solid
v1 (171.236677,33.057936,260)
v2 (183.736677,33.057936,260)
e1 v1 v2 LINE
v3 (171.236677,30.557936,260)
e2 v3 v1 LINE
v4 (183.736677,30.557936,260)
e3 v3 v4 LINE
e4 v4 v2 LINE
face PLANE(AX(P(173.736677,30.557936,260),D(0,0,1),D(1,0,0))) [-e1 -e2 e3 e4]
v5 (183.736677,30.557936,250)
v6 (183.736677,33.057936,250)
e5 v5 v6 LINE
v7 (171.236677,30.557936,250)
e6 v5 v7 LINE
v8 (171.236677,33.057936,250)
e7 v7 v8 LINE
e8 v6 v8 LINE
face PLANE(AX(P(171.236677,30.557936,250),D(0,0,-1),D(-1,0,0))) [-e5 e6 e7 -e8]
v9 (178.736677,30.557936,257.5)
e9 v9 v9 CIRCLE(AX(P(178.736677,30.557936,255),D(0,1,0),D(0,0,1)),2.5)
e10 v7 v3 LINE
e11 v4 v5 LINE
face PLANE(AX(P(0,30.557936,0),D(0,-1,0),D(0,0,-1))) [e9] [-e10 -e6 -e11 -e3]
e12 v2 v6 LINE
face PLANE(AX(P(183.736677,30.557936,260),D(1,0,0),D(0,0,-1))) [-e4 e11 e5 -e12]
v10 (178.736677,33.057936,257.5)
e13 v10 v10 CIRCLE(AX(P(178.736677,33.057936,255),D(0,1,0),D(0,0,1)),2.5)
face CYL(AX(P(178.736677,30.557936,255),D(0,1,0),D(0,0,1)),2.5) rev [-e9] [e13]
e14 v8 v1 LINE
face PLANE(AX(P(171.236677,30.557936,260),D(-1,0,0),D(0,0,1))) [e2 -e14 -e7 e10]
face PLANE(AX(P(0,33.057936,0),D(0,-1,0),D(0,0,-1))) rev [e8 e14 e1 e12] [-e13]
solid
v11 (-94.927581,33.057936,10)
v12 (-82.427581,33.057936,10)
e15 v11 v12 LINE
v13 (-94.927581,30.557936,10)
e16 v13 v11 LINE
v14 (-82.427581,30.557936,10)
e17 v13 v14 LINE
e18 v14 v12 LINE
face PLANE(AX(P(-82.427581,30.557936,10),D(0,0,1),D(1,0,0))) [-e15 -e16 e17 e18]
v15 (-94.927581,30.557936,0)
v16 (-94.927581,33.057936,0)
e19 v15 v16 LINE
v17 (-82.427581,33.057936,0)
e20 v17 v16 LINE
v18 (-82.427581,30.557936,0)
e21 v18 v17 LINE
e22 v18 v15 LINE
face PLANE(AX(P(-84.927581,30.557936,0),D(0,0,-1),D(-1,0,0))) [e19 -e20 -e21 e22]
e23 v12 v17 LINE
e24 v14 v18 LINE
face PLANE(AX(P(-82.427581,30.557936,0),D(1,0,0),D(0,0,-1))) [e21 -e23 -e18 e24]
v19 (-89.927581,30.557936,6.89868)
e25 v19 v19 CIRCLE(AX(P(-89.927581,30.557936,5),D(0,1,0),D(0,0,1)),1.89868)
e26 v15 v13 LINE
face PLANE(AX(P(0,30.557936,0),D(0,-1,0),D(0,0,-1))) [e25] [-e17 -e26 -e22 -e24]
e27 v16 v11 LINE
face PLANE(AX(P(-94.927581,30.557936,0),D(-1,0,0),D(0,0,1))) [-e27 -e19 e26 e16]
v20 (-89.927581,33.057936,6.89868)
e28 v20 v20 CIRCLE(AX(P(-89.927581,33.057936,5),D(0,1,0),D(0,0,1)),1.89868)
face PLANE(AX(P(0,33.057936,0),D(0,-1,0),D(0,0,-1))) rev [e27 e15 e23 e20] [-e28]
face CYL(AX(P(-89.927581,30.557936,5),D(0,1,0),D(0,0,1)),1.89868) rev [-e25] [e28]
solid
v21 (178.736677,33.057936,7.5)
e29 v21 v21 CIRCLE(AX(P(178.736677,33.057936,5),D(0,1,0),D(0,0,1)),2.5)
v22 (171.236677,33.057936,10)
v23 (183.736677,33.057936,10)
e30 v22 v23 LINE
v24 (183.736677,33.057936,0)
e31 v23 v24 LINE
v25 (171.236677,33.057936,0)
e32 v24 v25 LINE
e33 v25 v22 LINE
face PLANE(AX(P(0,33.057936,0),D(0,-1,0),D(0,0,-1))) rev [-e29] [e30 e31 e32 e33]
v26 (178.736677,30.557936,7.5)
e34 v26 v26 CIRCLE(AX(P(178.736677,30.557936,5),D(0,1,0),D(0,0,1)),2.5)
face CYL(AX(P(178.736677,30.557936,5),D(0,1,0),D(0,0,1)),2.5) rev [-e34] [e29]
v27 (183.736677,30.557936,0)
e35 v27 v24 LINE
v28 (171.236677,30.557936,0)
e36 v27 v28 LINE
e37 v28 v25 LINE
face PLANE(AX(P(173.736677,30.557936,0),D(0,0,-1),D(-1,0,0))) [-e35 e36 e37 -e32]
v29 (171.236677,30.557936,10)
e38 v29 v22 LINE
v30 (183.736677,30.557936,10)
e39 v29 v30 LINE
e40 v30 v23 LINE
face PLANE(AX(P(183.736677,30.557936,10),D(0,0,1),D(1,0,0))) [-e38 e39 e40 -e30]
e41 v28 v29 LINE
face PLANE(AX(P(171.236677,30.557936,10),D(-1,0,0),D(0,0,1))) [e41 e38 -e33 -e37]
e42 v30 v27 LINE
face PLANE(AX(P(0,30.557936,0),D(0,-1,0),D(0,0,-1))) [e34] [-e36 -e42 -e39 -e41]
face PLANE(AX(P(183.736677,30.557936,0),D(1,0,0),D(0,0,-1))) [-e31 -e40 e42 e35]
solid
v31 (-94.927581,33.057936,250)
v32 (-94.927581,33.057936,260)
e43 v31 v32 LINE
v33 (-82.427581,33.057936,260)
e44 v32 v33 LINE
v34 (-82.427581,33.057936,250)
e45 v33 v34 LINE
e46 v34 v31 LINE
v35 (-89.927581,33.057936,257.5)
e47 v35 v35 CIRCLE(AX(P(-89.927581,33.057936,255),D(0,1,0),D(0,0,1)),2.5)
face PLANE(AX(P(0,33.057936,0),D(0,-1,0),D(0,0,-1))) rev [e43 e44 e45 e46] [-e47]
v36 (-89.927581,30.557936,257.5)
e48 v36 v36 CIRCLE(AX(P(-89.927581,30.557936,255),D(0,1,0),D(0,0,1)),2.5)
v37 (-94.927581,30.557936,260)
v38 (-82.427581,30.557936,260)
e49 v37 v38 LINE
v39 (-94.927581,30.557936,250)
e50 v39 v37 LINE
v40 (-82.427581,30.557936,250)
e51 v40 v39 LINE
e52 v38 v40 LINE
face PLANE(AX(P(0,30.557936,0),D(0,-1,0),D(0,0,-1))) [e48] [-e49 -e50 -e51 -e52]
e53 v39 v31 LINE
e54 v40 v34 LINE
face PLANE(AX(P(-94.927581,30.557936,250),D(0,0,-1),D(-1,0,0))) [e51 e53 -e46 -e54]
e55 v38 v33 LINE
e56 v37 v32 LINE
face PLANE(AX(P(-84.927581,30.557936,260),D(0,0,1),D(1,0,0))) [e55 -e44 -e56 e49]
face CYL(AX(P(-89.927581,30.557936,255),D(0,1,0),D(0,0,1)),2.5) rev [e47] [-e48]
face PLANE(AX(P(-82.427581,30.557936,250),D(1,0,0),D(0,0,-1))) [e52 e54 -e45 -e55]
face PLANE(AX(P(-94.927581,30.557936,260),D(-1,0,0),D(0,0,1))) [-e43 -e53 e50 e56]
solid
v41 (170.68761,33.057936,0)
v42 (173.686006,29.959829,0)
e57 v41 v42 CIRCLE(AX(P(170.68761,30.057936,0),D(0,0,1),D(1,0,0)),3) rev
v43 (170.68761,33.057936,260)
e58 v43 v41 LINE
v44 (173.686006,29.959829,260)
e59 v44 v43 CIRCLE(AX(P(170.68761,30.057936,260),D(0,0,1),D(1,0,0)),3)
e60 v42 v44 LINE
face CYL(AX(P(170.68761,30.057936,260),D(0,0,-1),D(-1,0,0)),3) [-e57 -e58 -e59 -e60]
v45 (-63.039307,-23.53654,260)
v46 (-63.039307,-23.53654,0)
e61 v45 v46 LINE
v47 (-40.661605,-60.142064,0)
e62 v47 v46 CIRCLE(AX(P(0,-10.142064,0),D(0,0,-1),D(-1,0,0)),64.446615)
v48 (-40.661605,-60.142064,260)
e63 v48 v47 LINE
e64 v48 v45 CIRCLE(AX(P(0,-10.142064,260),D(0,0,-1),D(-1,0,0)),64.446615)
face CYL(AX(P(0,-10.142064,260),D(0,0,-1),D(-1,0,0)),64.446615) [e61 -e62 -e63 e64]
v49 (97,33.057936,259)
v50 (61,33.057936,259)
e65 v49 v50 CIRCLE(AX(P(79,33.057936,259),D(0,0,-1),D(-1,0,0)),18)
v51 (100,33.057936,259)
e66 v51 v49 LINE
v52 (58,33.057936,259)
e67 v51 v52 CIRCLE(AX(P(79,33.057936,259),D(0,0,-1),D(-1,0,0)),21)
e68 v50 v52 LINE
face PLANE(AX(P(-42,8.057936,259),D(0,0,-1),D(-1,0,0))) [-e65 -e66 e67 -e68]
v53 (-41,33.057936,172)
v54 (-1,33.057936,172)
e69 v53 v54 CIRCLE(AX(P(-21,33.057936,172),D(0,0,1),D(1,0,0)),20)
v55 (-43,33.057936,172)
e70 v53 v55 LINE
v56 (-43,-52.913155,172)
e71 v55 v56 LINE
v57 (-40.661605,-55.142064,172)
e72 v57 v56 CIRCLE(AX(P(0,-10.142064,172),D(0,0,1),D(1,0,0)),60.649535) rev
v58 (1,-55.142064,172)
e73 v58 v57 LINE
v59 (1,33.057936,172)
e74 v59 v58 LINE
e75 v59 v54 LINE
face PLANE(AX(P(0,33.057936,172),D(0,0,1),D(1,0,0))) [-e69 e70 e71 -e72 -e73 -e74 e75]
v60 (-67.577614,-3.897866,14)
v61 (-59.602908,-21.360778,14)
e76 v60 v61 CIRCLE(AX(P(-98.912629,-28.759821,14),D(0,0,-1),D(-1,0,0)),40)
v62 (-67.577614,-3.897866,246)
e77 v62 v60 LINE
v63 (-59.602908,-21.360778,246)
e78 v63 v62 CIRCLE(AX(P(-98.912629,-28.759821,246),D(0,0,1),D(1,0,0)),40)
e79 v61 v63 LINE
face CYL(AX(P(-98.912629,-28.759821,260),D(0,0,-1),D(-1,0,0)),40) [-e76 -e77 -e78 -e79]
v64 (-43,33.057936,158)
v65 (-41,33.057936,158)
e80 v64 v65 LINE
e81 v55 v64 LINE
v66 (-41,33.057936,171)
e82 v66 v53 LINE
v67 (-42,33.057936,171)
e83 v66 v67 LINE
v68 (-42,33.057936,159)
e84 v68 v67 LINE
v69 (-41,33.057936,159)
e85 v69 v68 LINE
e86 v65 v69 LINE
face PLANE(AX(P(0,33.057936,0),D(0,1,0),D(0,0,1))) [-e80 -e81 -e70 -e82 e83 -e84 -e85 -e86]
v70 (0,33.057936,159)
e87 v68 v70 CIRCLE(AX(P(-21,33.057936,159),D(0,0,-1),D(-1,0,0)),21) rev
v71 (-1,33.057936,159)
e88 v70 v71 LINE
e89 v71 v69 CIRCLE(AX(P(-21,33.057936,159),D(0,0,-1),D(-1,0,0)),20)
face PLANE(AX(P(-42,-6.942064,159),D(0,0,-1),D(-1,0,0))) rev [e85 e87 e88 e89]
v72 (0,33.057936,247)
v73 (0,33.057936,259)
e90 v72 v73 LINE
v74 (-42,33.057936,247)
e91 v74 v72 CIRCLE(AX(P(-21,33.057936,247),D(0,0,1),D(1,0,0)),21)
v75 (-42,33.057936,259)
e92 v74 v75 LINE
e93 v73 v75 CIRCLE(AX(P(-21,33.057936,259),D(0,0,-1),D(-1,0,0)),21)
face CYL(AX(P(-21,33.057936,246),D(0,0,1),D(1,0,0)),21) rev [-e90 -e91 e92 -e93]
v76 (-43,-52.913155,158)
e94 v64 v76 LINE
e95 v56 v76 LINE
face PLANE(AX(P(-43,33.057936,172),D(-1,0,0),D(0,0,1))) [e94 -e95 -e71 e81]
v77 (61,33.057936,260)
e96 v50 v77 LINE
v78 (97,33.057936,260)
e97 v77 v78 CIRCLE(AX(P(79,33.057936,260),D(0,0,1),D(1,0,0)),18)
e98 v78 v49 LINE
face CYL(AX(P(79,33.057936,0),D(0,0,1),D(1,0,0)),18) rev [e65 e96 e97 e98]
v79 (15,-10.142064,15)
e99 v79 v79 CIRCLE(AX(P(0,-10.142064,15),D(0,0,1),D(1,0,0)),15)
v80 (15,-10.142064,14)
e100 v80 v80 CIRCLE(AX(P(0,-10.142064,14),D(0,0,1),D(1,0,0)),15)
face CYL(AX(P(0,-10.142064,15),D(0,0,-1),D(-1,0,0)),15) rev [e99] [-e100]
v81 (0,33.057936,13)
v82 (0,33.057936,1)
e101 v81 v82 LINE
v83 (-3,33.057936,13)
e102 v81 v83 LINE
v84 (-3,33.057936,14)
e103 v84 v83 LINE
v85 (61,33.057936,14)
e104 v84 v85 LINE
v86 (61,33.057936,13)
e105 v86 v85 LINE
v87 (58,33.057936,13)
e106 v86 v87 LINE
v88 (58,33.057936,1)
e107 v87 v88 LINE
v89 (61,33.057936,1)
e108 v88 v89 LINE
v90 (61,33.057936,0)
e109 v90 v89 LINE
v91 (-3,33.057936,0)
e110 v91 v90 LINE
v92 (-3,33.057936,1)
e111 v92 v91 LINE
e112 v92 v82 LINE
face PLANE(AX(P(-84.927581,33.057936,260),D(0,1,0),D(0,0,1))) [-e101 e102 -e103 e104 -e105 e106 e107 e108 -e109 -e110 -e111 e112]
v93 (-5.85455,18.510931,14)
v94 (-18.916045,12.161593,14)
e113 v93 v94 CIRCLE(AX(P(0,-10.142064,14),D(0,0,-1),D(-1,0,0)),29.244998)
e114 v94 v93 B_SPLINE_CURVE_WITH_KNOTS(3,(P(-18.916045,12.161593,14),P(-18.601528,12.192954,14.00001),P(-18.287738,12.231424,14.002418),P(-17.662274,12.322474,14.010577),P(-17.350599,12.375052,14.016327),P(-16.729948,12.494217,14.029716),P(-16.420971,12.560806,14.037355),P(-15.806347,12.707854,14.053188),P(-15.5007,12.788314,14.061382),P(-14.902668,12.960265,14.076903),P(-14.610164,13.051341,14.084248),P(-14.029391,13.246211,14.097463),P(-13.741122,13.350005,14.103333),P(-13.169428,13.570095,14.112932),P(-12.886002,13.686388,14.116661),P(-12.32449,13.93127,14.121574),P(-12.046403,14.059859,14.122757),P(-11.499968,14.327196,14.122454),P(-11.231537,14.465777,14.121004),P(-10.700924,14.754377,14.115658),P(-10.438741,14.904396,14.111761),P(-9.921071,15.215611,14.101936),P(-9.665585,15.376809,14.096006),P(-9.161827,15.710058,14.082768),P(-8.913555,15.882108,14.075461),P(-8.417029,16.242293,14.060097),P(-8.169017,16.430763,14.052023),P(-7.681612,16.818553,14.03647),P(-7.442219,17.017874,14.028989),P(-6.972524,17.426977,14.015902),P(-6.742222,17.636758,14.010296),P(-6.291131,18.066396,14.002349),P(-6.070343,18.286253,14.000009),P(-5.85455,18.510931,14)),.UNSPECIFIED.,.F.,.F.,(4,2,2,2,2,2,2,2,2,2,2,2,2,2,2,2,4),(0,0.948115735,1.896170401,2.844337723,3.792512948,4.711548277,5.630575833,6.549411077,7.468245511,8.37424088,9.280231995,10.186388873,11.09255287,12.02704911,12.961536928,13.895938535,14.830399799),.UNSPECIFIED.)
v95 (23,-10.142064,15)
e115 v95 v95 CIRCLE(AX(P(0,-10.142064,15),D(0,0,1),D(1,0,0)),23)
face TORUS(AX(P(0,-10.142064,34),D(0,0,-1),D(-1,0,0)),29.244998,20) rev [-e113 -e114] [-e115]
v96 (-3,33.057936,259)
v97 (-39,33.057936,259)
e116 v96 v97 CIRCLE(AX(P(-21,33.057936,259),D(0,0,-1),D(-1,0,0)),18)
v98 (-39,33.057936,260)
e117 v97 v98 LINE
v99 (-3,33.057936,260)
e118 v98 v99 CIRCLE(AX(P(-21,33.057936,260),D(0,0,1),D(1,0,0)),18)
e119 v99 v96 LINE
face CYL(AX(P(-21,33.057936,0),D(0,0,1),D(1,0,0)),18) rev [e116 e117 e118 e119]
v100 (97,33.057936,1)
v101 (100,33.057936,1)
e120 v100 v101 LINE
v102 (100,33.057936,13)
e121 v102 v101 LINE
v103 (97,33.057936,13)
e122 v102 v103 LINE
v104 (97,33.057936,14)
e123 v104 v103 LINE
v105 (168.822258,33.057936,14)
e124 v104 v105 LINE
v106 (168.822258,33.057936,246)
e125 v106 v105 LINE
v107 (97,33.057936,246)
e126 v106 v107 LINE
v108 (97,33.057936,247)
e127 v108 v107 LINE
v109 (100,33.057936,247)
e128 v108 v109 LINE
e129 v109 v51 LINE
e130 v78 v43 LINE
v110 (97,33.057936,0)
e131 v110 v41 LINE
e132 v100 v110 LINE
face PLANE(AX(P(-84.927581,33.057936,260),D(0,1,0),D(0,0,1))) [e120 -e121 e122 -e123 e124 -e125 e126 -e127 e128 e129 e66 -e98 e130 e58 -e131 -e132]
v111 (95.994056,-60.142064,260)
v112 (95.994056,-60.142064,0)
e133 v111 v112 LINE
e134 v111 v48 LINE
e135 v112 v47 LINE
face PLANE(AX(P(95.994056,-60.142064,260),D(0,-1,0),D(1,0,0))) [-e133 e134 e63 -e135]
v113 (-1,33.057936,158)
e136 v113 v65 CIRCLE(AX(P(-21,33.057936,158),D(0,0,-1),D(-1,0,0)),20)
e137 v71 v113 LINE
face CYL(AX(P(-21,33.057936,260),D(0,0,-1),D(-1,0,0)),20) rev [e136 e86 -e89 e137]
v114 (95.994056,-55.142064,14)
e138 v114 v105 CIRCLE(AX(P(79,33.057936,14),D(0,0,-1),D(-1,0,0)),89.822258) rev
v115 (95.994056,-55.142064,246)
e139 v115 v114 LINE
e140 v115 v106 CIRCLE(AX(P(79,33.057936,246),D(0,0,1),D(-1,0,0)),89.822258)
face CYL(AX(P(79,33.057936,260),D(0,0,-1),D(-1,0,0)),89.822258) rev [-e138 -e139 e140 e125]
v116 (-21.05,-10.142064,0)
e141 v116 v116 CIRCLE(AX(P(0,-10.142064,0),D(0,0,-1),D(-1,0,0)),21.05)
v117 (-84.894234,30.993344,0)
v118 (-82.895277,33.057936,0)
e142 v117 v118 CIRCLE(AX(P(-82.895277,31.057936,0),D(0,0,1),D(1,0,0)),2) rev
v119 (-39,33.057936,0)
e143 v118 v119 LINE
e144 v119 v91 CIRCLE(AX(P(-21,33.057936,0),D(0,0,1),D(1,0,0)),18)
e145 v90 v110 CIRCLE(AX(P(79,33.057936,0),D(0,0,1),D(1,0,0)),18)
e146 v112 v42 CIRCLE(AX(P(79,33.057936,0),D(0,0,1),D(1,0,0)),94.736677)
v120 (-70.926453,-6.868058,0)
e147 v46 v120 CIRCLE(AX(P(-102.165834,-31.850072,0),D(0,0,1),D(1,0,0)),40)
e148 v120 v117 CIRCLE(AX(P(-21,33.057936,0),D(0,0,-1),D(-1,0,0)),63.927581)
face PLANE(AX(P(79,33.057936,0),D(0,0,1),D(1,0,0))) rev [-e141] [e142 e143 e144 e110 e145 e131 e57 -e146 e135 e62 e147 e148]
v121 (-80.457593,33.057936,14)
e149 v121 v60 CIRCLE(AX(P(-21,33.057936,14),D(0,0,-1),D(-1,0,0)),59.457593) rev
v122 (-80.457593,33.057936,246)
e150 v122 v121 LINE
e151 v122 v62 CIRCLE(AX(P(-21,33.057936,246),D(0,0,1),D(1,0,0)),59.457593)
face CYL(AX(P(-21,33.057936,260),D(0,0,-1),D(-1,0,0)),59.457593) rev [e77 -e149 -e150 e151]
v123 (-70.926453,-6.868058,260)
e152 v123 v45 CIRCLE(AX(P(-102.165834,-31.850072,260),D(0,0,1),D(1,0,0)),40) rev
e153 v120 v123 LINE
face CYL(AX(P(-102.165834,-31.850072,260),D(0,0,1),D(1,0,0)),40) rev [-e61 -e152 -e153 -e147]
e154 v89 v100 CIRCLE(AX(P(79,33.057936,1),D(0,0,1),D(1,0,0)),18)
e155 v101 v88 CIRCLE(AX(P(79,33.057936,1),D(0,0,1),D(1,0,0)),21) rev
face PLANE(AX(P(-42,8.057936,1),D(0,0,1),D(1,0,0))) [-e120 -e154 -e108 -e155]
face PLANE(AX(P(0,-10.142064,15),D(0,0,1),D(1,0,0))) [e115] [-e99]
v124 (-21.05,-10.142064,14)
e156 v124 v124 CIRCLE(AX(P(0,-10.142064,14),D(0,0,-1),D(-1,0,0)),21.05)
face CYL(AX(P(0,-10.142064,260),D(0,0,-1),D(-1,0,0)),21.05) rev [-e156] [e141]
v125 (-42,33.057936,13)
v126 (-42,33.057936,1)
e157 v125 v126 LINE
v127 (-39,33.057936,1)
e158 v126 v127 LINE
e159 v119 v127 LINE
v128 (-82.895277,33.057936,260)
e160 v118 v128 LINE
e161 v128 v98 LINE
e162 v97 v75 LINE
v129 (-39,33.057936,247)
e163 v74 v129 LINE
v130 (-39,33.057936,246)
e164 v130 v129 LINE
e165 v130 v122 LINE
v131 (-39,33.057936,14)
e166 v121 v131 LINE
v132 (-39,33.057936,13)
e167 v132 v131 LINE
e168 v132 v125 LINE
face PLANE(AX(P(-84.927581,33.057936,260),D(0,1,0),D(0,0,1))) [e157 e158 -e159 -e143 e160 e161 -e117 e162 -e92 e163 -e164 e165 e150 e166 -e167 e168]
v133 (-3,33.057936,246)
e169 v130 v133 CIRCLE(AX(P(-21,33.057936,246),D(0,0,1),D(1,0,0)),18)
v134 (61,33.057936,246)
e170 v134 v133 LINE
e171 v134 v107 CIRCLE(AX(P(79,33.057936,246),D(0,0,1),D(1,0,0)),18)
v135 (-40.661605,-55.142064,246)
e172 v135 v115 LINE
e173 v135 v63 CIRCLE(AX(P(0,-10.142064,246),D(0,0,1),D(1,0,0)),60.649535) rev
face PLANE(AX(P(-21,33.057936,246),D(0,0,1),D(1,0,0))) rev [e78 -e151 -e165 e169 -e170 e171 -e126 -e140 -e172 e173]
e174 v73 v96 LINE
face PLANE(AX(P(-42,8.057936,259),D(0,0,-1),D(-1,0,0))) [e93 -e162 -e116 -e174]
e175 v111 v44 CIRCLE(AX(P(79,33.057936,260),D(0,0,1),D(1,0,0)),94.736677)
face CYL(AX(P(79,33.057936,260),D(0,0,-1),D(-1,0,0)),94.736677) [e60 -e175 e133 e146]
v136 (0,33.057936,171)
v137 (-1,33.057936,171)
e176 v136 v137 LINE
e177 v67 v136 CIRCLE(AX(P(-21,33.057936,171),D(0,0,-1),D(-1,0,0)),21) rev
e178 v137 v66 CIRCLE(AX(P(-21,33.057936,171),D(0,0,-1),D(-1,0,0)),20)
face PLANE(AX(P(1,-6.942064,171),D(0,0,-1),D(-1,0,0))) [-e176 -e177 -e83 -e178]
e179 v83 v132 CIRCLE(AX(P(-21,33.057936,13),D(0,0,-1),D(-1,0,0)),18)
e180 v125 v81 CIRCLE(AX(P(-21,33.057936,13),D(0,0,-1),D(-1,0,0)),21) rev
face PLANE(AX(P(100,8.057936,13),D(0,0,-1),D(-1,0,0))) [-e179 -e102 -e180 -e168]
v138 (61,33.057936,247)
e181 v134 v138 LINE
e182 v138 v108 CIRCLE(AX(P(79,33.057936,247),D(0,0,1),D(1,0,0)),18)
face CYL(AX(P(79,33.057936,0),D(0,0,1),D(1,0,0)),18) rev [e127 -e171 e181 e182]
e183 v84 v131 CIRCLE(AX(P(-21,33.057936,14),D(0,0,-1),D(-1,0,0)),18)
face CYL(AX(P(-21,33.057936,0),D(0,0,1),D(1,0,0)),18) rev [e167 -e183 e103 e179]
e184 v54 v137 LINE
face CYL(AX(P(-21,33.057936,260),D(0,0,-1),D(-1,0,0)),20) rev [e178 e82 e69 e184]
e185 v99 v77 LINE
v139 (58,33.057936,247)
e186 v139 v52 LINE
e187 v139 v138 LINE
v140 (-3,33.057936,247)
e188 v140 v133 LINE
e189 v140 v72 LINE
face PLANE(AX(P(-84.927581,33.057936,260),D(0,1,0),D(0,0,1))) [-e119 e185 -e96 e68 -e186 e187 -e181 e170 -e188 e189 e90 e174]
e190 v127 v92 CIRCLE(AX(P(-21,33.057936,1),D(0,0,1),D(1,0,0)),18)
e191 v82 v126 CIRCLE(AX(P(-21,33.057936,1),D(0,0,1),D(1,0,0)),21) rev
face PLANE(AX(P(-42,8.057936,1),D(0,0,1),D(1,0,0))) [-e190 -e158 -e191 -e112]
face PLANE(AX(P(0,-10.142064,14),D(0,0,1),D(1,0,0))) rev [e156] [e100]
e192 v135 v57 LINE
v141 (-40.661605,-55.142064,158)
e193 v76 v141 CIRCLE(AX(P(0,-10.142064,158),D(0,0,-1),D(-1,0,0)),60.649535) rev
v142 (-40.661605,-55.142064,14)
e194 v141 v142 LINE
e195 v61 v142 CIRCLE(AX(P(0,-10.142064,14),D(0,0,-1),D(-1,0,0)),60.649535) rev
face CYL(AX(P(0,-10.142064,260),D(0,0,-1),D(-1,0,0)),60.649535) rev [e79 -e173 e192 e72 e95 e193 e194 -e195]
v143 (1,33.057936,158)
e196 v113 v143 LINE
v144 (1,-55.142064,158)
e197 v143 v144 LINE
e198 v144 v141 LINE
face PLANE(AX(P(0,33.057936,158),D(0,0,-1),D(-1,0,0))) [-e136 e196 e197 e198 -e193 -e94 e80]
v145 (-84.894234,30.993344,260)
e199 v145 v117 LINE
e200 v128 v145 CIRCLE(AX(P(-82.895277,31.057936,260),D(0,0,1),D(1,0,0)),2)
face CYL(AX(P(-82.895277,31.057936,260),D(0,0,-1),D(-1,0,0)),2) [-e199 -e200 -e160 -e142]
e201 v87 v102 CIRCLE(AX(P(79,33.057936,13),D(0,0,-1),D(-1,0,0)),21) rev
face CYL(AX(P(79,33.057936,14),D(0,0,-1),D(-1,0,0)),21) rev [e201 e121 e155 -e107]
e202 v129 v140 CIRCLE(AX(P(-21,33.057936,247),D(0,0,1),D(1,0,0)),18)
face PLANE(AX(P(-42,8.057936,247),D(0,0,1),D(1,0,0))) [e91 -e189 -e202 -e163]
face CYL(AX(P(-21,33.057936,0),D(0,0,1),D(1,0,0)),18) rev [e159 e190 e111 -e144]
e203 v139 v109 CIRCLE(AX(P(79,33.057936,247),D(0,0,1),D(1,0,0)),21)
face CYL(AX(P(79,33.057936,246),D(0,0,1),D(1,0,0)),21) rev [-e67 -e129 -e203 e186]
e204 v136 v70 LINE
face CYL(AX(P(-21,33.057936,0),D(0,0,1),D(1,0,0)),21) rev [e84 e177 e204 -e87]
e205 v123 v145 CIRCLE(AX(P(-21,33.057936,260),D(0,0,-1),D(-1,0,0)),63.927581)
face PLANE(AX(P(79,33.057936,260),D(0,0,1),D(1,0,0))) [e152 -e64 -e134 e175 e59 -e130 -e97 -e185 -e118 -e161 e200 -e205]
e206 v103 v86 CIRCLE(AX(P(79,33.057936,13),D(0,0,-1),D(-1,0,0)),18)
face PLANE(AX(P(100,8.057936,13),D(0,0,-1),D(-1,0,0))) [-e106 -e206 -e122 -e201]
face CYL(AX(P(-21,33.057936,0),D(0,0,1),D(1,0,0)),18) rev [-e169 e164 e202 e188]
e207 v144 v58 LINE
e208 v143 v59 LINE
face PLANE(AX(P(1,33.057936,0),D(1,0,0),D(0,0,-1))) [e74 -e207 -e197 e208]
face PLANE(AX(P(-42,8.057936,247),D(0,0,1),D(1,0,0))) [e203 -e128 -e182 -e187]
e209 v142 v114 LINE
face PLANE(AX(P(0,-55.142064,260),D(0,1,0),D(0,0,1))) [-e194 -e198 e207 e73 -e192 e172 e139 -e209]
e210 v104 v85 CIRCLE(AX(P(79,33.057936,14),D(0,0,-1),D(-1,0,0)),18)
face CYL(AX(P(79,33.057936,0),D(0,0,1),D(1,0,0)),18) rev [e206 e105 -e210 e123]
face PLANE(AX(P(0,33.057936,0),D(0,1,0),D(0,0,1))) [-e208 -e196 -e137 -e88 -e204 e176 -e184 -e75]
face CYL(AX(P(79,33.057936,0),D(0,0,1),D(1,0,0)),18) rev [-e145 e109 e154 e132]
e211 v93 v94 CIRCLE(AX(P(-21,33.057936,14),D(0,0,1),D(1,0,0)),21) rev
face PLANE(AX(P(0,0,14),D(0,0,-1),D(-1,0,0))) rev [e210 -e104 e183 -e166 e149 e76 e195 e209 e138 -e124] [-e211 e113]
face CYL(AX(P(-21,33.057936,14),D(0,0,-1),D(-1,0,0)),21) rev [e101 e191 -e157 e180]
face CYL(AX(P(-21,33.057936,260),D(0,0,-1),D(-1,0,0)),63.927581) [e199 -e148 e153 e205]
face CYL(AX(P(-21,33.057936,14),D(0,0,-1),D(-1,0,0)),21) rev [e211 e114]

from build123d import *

# Parameters (mm, degrees)
BOSS_EXTRUDE2_DEPTH     = 260
BOSS_EXTRUDE3_DEPTH     = 14
SKETCH32_R              = 2.5
BOSS_EXTRUDE13_DEPTH    = 2.5
BOSS_EXTRUDE13_2_DEPTH  = 2.5
BOSS_EXTRUDE13_3_DEPTH  = 2.5
SKETCH32_R_2            = 1.89867991
BOSS_EXTRUDE13_4_DEPTH  = 2.5
SKETCH6_R               = 21.05
CUT_EXTRUDE1_DEPTH      = 325.000361639
BOSS_EXTRUDE4_START     = -14
BOSS_EXTRUDE4_DEPTH     = 14
BOSS_EXTRUDE5_DEPTH     = 88.2
CUT_EXTRUDE4_DEPTH      = 259.766756641
CUT_EXTRUDE4_DEPTH_BACK = 259.766756641
SKETCH16_R              = 21
SKETCH19_W              = 44
SKETCH19_H              = 1
BOSS_EXTRUDE9_DEPTH     = 40
SKETCH21_W              = 42
SKETCH21_H              = 1
BOSS_EXTRUDE10_DEPTH    = 40
CUT_EXTRUDE5_DEPTH      = 250.680264223
CUT_EXTRUDE5_DEPTH_BACK = 250.680264223
SKETCH22_R              = 20
FILLET7_R               = 40
FILLET8_R               = 40
SKETCH26_R              = 23
SKETCH26_R_2            = 15
BOSS_EXTRUDE11_DEPTH    = 1
FILLET9_R               = 20
SKETCH27_W              = 142
SKETCH27_H              = 1
BOSS_EXTRUDE12_DEPTH    = 25
CUT_EXTRUDE7_DEPTH      = 325.000361738
CUT_EXTRUDE7_DEPTH_BACK = 325.000361738
SKETCH28_R              = 18
SKETCH31_R              = 21.05
CUT_EXTRUDE8_DEPTH      = 14
FILLET12_R              = 2
FILLET15_R              = 3


with BuildPart() as part:
    # Sketch4 → Boss-Extrude2 (new body)
    with BuildSketch(Plane.XY):
        with BuildLine():
            Line((0, -55.142064338), (95.994056336, -55.142064338))
            ThreePointArc((95.994056336, -55.142064338), (148.262119718, -24.132944056), (168.822257546, 33.057935662))
            Line((168.822257546, 33.057935662), (173.736676904, 33.057935662))
            ThreePointArc((173.736676904, 33.057935662), (151.749564862, -27.625989418), (95.994056336, -60.142064338))
            Line((95.994056336, -60.142064338), (-40.661605406, -60.142064338))
            ThreePointArc((-40.661605406, -60.142064338), (-57.355877726, -39.530317849), (-64.334580903, -13.940465884))
            ThreePointArc((-64.334580903, -13.940465884), (-79.553439665, 7.401935326), (-84.927581292, 33.057935662))
            Line((-84.927581292, 33.057935662), (-80.457592966, 33.057935662))
            ThreePointArc((-80.457592966, 33.057935662), (-75.277345345, 8.785005398), (-60.639261472, -11.25836282))
            ThreePointArc((-60.639261472, -11.25836282), (-55.198833523, -35.270831357), (-40.661605406, -55.142064338))
            Line((-40.661605406, -55.142064338), (0, -55.142064338))
        make_face()
    extrude(amount=BOSS_EXTRUDE2_DEPTH)

    # Sketch5 → Boss-Extrude3 (add)
    with BuildSketch(Plane(origin=(0, 0, 0), x_dir=(-1, 0, 0), z_dir=(0, 0, -1))):
        with BuildLine():
            ThreePointArc((-58, 33.057935662), (-79, 12.057935662), (-100, 33.057935662))
            Line((-100, 33.057935662), (-168.822257546, 33.057935662))
            ThreePointArc((-168.822257546, 33.057935662), (-148.262119718, -24.132944056), (-95.994056336, -55.142064338))
            Line((-95.994056336, -55.142064338), (40.661605406, -55.142064338))
            ThreePointArc((40.661605406, -55.142064338), (55.198833523, -35.270831357), (60.639261472, -11.25836282))
            ThreePointArc((60.639261472, -11.25836282), (69.157100692, -1.81467557), (75.471736637, 9.224445171))
            ThreePointArc((75.471736637, 9.224445171), (79.197782202, 20.883227942), (80.457592966, 33.057935662))
            Line((80.457592966, 33.057935662), (42, 33.057935662))
            ThreePointArc((42, 33.057935662), (21, 12.057935662), (0, 33.057935662))
            Line((0, 33.057935662), (-58, 33.057935662))
        make_face()
    extrude(amount=-BOSS_EXTRUDE3_DEPTH)

    # Sketch6 → Cut-Extrude1 (cut, through all)
    with BuildSketch(Plane(origin=(0, 0, 0), x_dir=(-1, 0, 0), z_dir=(0, 0, -1))):
        with Locations((0, -10.142064338)):
            Circle(SKETCH6_R)
    extrude(amount=-CUT_EXTRUDE1_DEPTH, mode=Mode.SUBTRACT)

    # Sketch8 → Boss-Extrude4 (add)
    with BuildSketch(Plane.XY.offset(260).offset(BOSS_EXTRUDE4_START)):
        with BuildLine():
            Line((-40.446345249, -56.420444517), (95.994056336, -55.142064338))
            ThreePointArc((95.994056336, -55.142064338), (148.262119718, -24.132944056), (168.822257546, 33.057935662))
            Line((168.822257546, 33.057935662), (100, 33.057935662))
            ThreePointArc((100, 33.057935662), (79, 12.057935662), (58, 33.057935662))
            Line((58, 33.057935662), (0, 33.057935662))
            ThreePointArc((0, 33.057935662), (-21, 12.057935662), (-42, 33.057935662))
            Line((-42, 33.057935662), (-80.457592966, 33.057935662))
            ThreePointArc((-80.457592966, 33.057935662), (-75.277345345, 8.785005398), (-60.639261472, -11.25836282))
            ThreePointArc((-60.639261472, -11.25836282), (-55.357730963, -35.99225903), (-40.446345249, -56.420444517))
        make_face()
    extrude(amount=BOSS_EXTRUDE4_DEPTH)

    # Sketch9 → Boss-Extrude5 (add)
    with BuildSketch(Plane(origin=(0, -55.142064338, 0), x_dir=(1, 0, 0), z_dir=(0, 1, 0))):
        Polygon((1, -158), (-21, -158), (-43, -158), (-43, -172), (1, -172), align=None)
    extrude(amount=BOSS_EXTRUDE5_DEPTH)

    # Sketch16 → Cut-Extrude4 (cut, two sides: drawn at the far end of the back side and taken through both)
    with BuildSketch(Plane.XY.offset(172).offset(-CUT_EXTRUDE4_DEPTH_BACK)):
        with Locations((-21, 33.057935662)):
            Circle(SKETCH16_R)
    extrude(amount=CUT_EXTRUDE4_DEPTH + CUT_EXTRUDE4_DEPTH_BACK, mode=Mode.SUBTRACT)

    # Sketch19 → Boss-Extrude9 (add)
    with BuildSketch(Plane(origin=(0, 33.057935662, 172), x_dir=(1, 0, 0), z_dir=(0, 1, 0))):
        with Locations((-21, 0.5)):
            Rectangle(SKETCH19_W, SKETCH19_H)
    extrude(amount=-BOSS_EXTRUDE9_DEPTH)

    # Sketch21 → Boss-Extrude10 (add)
    with BuildSketch(Plane(origin=(0, 33.057935662, 158), x_dir=(-1, 0, 0), z_dir=(0, -1, 0))):
        with Locations((21, -0.5)):
            Rectangle(SKETCH21_W, SKETCH21_H)
    extrude(amount=BOSS_EXTRUDE10_DEPTH)

    # Sketch22 → Cut-Extrude5 (cut, two sides: drawn at the far end of the back side and taken through both)
    with BuildSketch(Plane(origin=(0, 0, 158), x_dir=(-1, 0, 0), z_dir=(0, 0, -1)).offset(-CUT_EXTRUDE5_DEPTH_BACK)):
        with Locations((21, 33.057935662)):
            Circle(SKETCH22_R)
    extrude(amount=CUT_EXTRUDE5_DEPTH + CUT_EXTRUDE5_DEPTH_BACK, mode=Mode.SUBTRACT)

    # Fillet7
    fillet7_edges = [part.edges().sort_by_distance(p)[0] for p in [
        (-60.639261472, -11.25836282, 130),
    ]]
    fillet(fillet7_edges, radius=FILLET7_R)

    # Fillet8
    fillet8_edges = [part.edges().sort_by_distance(p)[0] for p in [
        (-64.334580903, -13.940465884, 130),
    ]]
    fillet(fillet8_edges, radius=FILLET8_R)

    # Sketch26 → Boss-Extrude11 (add)
    with BuildSketch(Plane.XY.offset(14)):
        with Locations(Location((0, -10.142064338, 0), (0, 0, 180))):
            Circle(SKETCH26_R)
        with Locations((0, -10.142064338)):
            Circle(SKETCH26_R_2, mode=Mode.SUBTRACT)
    extrude(amount=BOSS_EXTRUDE11_DEPTH)

    # Fillet9
    # the kernel refuses this fillet: 20 mm, written as the material it adds along each edge
    with BuildSketch(Plane(origin=(0, -10.142064338, 14), x_dir=(-1, 0, 0), z_dir=(0, 1, 0))) as fillet9_piece_1_section:
        with BuildLine():
            CenterArc((29.244997998, 20), FILLET9_R, 251.805127661, 18.194872339)
            Line((23, 1), (22.87510004, 0.62))
            ThreePointArc((22.87510004, 0.62), (22.6, 0.5), (22.6, 0))
            Line((22.6, 0), (23, -0.4))
            Line((23, -0.4), (29.244997998, -0.4))
            Line((29.244997998, -0.4), (29.244997998, 0))
        make_face()
    fillet9_piece_1 = revolve(axis=Axis((0, -10.142064338, 14), (0, 0, 1)), mode=Mode.PRIVATE)
    fillet9_piece_1 = fillet9_piece_1 - Plane(origin=(-21, 33.057935662, 14.160984857), x_dir=(-1, 0, 0), z_dir=(0, 0, -1)) * Cylinder(21, 117, mode=Mode.PRIVATE)
    add(fillet9_piece_1)

    # Sketch27 → Boss-Extrude12 (add)
    with BuildSketch(Plane(origin=(0, 33.057935662, 0), x_dir=(1, 0, 0), z_dir=(0, 1, 0))):
        with Locations((29, -0.5)):
            Rectangle(SKETCH27_W, SKETCH27_H)
        with Locations((29, -246.5)):
            Rectangle(SKETCH27_W, SKETCH27_H)
        with Locations((29, -13.5)):
            Rectangle(SKETCH27_W, SKETCH27_H)
        with Locations((29, -259.5)):
            Rectangle(SKETCH27_W, SKETCH27_H)
    extrude(amount=-BOSS_EXTRUDE12_DEPTH)

    # Sketch28 → Cut-Extrude7 (cut, two sides: drawn at the far end of the back side and taken through both)
    with BuildSketch(Plane.XY.offset(260).offset(-CUT_EXTRUDE7_DEPTH_BACK)):
        with Locations((-21, 33.057935662)):
            Circle(SKETCH28_R)
        with Locations((79, 33.057935662)):
            Circle(SKETCH28_R)
    extrude(amount=CUT_EXTRUDE7_DEPTH + CUT_EXTRUDE7_DEPTH_BACK, mode=Mode.SUBTRACT)

    # Sketch31 → Cut-Extrude8 (cut)
    with BuildSketch(Plane(origin=(0, 0, 0), x_dir=(-1, 0, 0), z_dir=(0, 0, -1))):
        with Locations((0, -10.142064338)):
            Circle(SKETCH31_R)
    extrude(amount=-CUT_EXTRUDE8_DEPTH, mode=Mode.SUBTRACT)

    # Fillet12
    fillet12_edges = [part.edges().sort_by_distance(p)[0] for p in [
        (-84.927581292, 33.057935662, 130),
    ]]
    fillet(fillet12_edges, radius=FILLET12_R)

    # Fillet15
    fillet15_edges = [part.edges().sort_by_distance(p)[0] for p in [
        (173.736676904, 33.057935662, 130),
    ]]
    fillet(fillet15_edges, radius=FILLET15_R)


with BuildPart() as body_2:
    # Sketch32 → Boss-Extrude13 (new body)
    with BuildSketch(Plane(origin=(0, 33.057935662, 0), x_dir=(1, 0, 0), z_dir=(0, 1, 0))):
        Polygon((173.736676904, -260), (183.736676904, -260), (183.736676904, -250), (173.736676904, -250), (171.236676904, -250), (171.236676904, -260), align=None)
        with Locations(Location((178.736676904, -255, 0), (0, 0, 270))):
            Circle(SKETCH32_R, mode=Mode.SUBTRACT)
    extrude(amount=-BOSS_EXTRUDE13_DEPTH)


with BuildPart() as body_3:
    # Sketch32 → Boss-Extrude13 2 (new body)
    with BuildSketch(Plane(origin=(0, 33.057935662, 0), x_dir=(1, 0, 0), z_dir=(0, 1, 0))):
        Polygon((173.736676904, 0), (183.736676904, 0), (183.736676904, -10), (173.736676904, -10), (171.236676904, -10), (171.236676904, 0), align=None)
        with Locations(Location((178.736676904, -5, 0), (0, 0, 270))):
            Circle(SKETCH32_R, mode=Mode.SUBTRACT)
    extrude(amount=-BOSS_EXTRUDE13_2_DEPTH)


with BuildPart() as body_4:
    # Sketch32 → Boss-Extrude13 3 (new body)
    with BuildSketch(Plane(origin=(0, 33.057935662, 0), x_dir=(1, 0, 0), z_dir=(0, 1, 0))):
        Polygon((-84.927581292, -260), (-94.927581292, -260), (-94.927581292, -250), (-84.927581292, -250), (-82.427581292, -250), (-82.427581292, -260), align=None)
        with Locations(Location((-89.927581292, -255, 0), (0, 0, 270))):
            Circle(SKETCH32_R, mode=Mode.SUBTRACT)
    extrude(amount=-BOSS_EXTRUDE13_3_DEPTH)


with BuildPart() as body_5:
    # Sketch32 → Boss-Extrude13 4 (new body)
    with BuildSketch(Plane(origin=(0, 33.057935662, 0), x_dir=(1, 0, 0), z_dir=(0, 1, 0))):
        Polygon((-84.927581292, 0), (-94.927581292, 0), (-94.927581292, -10), (-84.927581292, -10), (-82.427581292, -10), (-82.427581292, 0), align=None)
        with Locations(Location((-89.927581292, -5, 0), (0, 0, 270))):
            Circle(SKETCH32_R_2, mode=Mode.SUBTRACT)
    extrude(amount=-BOSS_EXTRUDE13_4_DEPTH)


solid = Compound([part.part, body_2.part, body_3.part, body_4.part, body_5.part])
